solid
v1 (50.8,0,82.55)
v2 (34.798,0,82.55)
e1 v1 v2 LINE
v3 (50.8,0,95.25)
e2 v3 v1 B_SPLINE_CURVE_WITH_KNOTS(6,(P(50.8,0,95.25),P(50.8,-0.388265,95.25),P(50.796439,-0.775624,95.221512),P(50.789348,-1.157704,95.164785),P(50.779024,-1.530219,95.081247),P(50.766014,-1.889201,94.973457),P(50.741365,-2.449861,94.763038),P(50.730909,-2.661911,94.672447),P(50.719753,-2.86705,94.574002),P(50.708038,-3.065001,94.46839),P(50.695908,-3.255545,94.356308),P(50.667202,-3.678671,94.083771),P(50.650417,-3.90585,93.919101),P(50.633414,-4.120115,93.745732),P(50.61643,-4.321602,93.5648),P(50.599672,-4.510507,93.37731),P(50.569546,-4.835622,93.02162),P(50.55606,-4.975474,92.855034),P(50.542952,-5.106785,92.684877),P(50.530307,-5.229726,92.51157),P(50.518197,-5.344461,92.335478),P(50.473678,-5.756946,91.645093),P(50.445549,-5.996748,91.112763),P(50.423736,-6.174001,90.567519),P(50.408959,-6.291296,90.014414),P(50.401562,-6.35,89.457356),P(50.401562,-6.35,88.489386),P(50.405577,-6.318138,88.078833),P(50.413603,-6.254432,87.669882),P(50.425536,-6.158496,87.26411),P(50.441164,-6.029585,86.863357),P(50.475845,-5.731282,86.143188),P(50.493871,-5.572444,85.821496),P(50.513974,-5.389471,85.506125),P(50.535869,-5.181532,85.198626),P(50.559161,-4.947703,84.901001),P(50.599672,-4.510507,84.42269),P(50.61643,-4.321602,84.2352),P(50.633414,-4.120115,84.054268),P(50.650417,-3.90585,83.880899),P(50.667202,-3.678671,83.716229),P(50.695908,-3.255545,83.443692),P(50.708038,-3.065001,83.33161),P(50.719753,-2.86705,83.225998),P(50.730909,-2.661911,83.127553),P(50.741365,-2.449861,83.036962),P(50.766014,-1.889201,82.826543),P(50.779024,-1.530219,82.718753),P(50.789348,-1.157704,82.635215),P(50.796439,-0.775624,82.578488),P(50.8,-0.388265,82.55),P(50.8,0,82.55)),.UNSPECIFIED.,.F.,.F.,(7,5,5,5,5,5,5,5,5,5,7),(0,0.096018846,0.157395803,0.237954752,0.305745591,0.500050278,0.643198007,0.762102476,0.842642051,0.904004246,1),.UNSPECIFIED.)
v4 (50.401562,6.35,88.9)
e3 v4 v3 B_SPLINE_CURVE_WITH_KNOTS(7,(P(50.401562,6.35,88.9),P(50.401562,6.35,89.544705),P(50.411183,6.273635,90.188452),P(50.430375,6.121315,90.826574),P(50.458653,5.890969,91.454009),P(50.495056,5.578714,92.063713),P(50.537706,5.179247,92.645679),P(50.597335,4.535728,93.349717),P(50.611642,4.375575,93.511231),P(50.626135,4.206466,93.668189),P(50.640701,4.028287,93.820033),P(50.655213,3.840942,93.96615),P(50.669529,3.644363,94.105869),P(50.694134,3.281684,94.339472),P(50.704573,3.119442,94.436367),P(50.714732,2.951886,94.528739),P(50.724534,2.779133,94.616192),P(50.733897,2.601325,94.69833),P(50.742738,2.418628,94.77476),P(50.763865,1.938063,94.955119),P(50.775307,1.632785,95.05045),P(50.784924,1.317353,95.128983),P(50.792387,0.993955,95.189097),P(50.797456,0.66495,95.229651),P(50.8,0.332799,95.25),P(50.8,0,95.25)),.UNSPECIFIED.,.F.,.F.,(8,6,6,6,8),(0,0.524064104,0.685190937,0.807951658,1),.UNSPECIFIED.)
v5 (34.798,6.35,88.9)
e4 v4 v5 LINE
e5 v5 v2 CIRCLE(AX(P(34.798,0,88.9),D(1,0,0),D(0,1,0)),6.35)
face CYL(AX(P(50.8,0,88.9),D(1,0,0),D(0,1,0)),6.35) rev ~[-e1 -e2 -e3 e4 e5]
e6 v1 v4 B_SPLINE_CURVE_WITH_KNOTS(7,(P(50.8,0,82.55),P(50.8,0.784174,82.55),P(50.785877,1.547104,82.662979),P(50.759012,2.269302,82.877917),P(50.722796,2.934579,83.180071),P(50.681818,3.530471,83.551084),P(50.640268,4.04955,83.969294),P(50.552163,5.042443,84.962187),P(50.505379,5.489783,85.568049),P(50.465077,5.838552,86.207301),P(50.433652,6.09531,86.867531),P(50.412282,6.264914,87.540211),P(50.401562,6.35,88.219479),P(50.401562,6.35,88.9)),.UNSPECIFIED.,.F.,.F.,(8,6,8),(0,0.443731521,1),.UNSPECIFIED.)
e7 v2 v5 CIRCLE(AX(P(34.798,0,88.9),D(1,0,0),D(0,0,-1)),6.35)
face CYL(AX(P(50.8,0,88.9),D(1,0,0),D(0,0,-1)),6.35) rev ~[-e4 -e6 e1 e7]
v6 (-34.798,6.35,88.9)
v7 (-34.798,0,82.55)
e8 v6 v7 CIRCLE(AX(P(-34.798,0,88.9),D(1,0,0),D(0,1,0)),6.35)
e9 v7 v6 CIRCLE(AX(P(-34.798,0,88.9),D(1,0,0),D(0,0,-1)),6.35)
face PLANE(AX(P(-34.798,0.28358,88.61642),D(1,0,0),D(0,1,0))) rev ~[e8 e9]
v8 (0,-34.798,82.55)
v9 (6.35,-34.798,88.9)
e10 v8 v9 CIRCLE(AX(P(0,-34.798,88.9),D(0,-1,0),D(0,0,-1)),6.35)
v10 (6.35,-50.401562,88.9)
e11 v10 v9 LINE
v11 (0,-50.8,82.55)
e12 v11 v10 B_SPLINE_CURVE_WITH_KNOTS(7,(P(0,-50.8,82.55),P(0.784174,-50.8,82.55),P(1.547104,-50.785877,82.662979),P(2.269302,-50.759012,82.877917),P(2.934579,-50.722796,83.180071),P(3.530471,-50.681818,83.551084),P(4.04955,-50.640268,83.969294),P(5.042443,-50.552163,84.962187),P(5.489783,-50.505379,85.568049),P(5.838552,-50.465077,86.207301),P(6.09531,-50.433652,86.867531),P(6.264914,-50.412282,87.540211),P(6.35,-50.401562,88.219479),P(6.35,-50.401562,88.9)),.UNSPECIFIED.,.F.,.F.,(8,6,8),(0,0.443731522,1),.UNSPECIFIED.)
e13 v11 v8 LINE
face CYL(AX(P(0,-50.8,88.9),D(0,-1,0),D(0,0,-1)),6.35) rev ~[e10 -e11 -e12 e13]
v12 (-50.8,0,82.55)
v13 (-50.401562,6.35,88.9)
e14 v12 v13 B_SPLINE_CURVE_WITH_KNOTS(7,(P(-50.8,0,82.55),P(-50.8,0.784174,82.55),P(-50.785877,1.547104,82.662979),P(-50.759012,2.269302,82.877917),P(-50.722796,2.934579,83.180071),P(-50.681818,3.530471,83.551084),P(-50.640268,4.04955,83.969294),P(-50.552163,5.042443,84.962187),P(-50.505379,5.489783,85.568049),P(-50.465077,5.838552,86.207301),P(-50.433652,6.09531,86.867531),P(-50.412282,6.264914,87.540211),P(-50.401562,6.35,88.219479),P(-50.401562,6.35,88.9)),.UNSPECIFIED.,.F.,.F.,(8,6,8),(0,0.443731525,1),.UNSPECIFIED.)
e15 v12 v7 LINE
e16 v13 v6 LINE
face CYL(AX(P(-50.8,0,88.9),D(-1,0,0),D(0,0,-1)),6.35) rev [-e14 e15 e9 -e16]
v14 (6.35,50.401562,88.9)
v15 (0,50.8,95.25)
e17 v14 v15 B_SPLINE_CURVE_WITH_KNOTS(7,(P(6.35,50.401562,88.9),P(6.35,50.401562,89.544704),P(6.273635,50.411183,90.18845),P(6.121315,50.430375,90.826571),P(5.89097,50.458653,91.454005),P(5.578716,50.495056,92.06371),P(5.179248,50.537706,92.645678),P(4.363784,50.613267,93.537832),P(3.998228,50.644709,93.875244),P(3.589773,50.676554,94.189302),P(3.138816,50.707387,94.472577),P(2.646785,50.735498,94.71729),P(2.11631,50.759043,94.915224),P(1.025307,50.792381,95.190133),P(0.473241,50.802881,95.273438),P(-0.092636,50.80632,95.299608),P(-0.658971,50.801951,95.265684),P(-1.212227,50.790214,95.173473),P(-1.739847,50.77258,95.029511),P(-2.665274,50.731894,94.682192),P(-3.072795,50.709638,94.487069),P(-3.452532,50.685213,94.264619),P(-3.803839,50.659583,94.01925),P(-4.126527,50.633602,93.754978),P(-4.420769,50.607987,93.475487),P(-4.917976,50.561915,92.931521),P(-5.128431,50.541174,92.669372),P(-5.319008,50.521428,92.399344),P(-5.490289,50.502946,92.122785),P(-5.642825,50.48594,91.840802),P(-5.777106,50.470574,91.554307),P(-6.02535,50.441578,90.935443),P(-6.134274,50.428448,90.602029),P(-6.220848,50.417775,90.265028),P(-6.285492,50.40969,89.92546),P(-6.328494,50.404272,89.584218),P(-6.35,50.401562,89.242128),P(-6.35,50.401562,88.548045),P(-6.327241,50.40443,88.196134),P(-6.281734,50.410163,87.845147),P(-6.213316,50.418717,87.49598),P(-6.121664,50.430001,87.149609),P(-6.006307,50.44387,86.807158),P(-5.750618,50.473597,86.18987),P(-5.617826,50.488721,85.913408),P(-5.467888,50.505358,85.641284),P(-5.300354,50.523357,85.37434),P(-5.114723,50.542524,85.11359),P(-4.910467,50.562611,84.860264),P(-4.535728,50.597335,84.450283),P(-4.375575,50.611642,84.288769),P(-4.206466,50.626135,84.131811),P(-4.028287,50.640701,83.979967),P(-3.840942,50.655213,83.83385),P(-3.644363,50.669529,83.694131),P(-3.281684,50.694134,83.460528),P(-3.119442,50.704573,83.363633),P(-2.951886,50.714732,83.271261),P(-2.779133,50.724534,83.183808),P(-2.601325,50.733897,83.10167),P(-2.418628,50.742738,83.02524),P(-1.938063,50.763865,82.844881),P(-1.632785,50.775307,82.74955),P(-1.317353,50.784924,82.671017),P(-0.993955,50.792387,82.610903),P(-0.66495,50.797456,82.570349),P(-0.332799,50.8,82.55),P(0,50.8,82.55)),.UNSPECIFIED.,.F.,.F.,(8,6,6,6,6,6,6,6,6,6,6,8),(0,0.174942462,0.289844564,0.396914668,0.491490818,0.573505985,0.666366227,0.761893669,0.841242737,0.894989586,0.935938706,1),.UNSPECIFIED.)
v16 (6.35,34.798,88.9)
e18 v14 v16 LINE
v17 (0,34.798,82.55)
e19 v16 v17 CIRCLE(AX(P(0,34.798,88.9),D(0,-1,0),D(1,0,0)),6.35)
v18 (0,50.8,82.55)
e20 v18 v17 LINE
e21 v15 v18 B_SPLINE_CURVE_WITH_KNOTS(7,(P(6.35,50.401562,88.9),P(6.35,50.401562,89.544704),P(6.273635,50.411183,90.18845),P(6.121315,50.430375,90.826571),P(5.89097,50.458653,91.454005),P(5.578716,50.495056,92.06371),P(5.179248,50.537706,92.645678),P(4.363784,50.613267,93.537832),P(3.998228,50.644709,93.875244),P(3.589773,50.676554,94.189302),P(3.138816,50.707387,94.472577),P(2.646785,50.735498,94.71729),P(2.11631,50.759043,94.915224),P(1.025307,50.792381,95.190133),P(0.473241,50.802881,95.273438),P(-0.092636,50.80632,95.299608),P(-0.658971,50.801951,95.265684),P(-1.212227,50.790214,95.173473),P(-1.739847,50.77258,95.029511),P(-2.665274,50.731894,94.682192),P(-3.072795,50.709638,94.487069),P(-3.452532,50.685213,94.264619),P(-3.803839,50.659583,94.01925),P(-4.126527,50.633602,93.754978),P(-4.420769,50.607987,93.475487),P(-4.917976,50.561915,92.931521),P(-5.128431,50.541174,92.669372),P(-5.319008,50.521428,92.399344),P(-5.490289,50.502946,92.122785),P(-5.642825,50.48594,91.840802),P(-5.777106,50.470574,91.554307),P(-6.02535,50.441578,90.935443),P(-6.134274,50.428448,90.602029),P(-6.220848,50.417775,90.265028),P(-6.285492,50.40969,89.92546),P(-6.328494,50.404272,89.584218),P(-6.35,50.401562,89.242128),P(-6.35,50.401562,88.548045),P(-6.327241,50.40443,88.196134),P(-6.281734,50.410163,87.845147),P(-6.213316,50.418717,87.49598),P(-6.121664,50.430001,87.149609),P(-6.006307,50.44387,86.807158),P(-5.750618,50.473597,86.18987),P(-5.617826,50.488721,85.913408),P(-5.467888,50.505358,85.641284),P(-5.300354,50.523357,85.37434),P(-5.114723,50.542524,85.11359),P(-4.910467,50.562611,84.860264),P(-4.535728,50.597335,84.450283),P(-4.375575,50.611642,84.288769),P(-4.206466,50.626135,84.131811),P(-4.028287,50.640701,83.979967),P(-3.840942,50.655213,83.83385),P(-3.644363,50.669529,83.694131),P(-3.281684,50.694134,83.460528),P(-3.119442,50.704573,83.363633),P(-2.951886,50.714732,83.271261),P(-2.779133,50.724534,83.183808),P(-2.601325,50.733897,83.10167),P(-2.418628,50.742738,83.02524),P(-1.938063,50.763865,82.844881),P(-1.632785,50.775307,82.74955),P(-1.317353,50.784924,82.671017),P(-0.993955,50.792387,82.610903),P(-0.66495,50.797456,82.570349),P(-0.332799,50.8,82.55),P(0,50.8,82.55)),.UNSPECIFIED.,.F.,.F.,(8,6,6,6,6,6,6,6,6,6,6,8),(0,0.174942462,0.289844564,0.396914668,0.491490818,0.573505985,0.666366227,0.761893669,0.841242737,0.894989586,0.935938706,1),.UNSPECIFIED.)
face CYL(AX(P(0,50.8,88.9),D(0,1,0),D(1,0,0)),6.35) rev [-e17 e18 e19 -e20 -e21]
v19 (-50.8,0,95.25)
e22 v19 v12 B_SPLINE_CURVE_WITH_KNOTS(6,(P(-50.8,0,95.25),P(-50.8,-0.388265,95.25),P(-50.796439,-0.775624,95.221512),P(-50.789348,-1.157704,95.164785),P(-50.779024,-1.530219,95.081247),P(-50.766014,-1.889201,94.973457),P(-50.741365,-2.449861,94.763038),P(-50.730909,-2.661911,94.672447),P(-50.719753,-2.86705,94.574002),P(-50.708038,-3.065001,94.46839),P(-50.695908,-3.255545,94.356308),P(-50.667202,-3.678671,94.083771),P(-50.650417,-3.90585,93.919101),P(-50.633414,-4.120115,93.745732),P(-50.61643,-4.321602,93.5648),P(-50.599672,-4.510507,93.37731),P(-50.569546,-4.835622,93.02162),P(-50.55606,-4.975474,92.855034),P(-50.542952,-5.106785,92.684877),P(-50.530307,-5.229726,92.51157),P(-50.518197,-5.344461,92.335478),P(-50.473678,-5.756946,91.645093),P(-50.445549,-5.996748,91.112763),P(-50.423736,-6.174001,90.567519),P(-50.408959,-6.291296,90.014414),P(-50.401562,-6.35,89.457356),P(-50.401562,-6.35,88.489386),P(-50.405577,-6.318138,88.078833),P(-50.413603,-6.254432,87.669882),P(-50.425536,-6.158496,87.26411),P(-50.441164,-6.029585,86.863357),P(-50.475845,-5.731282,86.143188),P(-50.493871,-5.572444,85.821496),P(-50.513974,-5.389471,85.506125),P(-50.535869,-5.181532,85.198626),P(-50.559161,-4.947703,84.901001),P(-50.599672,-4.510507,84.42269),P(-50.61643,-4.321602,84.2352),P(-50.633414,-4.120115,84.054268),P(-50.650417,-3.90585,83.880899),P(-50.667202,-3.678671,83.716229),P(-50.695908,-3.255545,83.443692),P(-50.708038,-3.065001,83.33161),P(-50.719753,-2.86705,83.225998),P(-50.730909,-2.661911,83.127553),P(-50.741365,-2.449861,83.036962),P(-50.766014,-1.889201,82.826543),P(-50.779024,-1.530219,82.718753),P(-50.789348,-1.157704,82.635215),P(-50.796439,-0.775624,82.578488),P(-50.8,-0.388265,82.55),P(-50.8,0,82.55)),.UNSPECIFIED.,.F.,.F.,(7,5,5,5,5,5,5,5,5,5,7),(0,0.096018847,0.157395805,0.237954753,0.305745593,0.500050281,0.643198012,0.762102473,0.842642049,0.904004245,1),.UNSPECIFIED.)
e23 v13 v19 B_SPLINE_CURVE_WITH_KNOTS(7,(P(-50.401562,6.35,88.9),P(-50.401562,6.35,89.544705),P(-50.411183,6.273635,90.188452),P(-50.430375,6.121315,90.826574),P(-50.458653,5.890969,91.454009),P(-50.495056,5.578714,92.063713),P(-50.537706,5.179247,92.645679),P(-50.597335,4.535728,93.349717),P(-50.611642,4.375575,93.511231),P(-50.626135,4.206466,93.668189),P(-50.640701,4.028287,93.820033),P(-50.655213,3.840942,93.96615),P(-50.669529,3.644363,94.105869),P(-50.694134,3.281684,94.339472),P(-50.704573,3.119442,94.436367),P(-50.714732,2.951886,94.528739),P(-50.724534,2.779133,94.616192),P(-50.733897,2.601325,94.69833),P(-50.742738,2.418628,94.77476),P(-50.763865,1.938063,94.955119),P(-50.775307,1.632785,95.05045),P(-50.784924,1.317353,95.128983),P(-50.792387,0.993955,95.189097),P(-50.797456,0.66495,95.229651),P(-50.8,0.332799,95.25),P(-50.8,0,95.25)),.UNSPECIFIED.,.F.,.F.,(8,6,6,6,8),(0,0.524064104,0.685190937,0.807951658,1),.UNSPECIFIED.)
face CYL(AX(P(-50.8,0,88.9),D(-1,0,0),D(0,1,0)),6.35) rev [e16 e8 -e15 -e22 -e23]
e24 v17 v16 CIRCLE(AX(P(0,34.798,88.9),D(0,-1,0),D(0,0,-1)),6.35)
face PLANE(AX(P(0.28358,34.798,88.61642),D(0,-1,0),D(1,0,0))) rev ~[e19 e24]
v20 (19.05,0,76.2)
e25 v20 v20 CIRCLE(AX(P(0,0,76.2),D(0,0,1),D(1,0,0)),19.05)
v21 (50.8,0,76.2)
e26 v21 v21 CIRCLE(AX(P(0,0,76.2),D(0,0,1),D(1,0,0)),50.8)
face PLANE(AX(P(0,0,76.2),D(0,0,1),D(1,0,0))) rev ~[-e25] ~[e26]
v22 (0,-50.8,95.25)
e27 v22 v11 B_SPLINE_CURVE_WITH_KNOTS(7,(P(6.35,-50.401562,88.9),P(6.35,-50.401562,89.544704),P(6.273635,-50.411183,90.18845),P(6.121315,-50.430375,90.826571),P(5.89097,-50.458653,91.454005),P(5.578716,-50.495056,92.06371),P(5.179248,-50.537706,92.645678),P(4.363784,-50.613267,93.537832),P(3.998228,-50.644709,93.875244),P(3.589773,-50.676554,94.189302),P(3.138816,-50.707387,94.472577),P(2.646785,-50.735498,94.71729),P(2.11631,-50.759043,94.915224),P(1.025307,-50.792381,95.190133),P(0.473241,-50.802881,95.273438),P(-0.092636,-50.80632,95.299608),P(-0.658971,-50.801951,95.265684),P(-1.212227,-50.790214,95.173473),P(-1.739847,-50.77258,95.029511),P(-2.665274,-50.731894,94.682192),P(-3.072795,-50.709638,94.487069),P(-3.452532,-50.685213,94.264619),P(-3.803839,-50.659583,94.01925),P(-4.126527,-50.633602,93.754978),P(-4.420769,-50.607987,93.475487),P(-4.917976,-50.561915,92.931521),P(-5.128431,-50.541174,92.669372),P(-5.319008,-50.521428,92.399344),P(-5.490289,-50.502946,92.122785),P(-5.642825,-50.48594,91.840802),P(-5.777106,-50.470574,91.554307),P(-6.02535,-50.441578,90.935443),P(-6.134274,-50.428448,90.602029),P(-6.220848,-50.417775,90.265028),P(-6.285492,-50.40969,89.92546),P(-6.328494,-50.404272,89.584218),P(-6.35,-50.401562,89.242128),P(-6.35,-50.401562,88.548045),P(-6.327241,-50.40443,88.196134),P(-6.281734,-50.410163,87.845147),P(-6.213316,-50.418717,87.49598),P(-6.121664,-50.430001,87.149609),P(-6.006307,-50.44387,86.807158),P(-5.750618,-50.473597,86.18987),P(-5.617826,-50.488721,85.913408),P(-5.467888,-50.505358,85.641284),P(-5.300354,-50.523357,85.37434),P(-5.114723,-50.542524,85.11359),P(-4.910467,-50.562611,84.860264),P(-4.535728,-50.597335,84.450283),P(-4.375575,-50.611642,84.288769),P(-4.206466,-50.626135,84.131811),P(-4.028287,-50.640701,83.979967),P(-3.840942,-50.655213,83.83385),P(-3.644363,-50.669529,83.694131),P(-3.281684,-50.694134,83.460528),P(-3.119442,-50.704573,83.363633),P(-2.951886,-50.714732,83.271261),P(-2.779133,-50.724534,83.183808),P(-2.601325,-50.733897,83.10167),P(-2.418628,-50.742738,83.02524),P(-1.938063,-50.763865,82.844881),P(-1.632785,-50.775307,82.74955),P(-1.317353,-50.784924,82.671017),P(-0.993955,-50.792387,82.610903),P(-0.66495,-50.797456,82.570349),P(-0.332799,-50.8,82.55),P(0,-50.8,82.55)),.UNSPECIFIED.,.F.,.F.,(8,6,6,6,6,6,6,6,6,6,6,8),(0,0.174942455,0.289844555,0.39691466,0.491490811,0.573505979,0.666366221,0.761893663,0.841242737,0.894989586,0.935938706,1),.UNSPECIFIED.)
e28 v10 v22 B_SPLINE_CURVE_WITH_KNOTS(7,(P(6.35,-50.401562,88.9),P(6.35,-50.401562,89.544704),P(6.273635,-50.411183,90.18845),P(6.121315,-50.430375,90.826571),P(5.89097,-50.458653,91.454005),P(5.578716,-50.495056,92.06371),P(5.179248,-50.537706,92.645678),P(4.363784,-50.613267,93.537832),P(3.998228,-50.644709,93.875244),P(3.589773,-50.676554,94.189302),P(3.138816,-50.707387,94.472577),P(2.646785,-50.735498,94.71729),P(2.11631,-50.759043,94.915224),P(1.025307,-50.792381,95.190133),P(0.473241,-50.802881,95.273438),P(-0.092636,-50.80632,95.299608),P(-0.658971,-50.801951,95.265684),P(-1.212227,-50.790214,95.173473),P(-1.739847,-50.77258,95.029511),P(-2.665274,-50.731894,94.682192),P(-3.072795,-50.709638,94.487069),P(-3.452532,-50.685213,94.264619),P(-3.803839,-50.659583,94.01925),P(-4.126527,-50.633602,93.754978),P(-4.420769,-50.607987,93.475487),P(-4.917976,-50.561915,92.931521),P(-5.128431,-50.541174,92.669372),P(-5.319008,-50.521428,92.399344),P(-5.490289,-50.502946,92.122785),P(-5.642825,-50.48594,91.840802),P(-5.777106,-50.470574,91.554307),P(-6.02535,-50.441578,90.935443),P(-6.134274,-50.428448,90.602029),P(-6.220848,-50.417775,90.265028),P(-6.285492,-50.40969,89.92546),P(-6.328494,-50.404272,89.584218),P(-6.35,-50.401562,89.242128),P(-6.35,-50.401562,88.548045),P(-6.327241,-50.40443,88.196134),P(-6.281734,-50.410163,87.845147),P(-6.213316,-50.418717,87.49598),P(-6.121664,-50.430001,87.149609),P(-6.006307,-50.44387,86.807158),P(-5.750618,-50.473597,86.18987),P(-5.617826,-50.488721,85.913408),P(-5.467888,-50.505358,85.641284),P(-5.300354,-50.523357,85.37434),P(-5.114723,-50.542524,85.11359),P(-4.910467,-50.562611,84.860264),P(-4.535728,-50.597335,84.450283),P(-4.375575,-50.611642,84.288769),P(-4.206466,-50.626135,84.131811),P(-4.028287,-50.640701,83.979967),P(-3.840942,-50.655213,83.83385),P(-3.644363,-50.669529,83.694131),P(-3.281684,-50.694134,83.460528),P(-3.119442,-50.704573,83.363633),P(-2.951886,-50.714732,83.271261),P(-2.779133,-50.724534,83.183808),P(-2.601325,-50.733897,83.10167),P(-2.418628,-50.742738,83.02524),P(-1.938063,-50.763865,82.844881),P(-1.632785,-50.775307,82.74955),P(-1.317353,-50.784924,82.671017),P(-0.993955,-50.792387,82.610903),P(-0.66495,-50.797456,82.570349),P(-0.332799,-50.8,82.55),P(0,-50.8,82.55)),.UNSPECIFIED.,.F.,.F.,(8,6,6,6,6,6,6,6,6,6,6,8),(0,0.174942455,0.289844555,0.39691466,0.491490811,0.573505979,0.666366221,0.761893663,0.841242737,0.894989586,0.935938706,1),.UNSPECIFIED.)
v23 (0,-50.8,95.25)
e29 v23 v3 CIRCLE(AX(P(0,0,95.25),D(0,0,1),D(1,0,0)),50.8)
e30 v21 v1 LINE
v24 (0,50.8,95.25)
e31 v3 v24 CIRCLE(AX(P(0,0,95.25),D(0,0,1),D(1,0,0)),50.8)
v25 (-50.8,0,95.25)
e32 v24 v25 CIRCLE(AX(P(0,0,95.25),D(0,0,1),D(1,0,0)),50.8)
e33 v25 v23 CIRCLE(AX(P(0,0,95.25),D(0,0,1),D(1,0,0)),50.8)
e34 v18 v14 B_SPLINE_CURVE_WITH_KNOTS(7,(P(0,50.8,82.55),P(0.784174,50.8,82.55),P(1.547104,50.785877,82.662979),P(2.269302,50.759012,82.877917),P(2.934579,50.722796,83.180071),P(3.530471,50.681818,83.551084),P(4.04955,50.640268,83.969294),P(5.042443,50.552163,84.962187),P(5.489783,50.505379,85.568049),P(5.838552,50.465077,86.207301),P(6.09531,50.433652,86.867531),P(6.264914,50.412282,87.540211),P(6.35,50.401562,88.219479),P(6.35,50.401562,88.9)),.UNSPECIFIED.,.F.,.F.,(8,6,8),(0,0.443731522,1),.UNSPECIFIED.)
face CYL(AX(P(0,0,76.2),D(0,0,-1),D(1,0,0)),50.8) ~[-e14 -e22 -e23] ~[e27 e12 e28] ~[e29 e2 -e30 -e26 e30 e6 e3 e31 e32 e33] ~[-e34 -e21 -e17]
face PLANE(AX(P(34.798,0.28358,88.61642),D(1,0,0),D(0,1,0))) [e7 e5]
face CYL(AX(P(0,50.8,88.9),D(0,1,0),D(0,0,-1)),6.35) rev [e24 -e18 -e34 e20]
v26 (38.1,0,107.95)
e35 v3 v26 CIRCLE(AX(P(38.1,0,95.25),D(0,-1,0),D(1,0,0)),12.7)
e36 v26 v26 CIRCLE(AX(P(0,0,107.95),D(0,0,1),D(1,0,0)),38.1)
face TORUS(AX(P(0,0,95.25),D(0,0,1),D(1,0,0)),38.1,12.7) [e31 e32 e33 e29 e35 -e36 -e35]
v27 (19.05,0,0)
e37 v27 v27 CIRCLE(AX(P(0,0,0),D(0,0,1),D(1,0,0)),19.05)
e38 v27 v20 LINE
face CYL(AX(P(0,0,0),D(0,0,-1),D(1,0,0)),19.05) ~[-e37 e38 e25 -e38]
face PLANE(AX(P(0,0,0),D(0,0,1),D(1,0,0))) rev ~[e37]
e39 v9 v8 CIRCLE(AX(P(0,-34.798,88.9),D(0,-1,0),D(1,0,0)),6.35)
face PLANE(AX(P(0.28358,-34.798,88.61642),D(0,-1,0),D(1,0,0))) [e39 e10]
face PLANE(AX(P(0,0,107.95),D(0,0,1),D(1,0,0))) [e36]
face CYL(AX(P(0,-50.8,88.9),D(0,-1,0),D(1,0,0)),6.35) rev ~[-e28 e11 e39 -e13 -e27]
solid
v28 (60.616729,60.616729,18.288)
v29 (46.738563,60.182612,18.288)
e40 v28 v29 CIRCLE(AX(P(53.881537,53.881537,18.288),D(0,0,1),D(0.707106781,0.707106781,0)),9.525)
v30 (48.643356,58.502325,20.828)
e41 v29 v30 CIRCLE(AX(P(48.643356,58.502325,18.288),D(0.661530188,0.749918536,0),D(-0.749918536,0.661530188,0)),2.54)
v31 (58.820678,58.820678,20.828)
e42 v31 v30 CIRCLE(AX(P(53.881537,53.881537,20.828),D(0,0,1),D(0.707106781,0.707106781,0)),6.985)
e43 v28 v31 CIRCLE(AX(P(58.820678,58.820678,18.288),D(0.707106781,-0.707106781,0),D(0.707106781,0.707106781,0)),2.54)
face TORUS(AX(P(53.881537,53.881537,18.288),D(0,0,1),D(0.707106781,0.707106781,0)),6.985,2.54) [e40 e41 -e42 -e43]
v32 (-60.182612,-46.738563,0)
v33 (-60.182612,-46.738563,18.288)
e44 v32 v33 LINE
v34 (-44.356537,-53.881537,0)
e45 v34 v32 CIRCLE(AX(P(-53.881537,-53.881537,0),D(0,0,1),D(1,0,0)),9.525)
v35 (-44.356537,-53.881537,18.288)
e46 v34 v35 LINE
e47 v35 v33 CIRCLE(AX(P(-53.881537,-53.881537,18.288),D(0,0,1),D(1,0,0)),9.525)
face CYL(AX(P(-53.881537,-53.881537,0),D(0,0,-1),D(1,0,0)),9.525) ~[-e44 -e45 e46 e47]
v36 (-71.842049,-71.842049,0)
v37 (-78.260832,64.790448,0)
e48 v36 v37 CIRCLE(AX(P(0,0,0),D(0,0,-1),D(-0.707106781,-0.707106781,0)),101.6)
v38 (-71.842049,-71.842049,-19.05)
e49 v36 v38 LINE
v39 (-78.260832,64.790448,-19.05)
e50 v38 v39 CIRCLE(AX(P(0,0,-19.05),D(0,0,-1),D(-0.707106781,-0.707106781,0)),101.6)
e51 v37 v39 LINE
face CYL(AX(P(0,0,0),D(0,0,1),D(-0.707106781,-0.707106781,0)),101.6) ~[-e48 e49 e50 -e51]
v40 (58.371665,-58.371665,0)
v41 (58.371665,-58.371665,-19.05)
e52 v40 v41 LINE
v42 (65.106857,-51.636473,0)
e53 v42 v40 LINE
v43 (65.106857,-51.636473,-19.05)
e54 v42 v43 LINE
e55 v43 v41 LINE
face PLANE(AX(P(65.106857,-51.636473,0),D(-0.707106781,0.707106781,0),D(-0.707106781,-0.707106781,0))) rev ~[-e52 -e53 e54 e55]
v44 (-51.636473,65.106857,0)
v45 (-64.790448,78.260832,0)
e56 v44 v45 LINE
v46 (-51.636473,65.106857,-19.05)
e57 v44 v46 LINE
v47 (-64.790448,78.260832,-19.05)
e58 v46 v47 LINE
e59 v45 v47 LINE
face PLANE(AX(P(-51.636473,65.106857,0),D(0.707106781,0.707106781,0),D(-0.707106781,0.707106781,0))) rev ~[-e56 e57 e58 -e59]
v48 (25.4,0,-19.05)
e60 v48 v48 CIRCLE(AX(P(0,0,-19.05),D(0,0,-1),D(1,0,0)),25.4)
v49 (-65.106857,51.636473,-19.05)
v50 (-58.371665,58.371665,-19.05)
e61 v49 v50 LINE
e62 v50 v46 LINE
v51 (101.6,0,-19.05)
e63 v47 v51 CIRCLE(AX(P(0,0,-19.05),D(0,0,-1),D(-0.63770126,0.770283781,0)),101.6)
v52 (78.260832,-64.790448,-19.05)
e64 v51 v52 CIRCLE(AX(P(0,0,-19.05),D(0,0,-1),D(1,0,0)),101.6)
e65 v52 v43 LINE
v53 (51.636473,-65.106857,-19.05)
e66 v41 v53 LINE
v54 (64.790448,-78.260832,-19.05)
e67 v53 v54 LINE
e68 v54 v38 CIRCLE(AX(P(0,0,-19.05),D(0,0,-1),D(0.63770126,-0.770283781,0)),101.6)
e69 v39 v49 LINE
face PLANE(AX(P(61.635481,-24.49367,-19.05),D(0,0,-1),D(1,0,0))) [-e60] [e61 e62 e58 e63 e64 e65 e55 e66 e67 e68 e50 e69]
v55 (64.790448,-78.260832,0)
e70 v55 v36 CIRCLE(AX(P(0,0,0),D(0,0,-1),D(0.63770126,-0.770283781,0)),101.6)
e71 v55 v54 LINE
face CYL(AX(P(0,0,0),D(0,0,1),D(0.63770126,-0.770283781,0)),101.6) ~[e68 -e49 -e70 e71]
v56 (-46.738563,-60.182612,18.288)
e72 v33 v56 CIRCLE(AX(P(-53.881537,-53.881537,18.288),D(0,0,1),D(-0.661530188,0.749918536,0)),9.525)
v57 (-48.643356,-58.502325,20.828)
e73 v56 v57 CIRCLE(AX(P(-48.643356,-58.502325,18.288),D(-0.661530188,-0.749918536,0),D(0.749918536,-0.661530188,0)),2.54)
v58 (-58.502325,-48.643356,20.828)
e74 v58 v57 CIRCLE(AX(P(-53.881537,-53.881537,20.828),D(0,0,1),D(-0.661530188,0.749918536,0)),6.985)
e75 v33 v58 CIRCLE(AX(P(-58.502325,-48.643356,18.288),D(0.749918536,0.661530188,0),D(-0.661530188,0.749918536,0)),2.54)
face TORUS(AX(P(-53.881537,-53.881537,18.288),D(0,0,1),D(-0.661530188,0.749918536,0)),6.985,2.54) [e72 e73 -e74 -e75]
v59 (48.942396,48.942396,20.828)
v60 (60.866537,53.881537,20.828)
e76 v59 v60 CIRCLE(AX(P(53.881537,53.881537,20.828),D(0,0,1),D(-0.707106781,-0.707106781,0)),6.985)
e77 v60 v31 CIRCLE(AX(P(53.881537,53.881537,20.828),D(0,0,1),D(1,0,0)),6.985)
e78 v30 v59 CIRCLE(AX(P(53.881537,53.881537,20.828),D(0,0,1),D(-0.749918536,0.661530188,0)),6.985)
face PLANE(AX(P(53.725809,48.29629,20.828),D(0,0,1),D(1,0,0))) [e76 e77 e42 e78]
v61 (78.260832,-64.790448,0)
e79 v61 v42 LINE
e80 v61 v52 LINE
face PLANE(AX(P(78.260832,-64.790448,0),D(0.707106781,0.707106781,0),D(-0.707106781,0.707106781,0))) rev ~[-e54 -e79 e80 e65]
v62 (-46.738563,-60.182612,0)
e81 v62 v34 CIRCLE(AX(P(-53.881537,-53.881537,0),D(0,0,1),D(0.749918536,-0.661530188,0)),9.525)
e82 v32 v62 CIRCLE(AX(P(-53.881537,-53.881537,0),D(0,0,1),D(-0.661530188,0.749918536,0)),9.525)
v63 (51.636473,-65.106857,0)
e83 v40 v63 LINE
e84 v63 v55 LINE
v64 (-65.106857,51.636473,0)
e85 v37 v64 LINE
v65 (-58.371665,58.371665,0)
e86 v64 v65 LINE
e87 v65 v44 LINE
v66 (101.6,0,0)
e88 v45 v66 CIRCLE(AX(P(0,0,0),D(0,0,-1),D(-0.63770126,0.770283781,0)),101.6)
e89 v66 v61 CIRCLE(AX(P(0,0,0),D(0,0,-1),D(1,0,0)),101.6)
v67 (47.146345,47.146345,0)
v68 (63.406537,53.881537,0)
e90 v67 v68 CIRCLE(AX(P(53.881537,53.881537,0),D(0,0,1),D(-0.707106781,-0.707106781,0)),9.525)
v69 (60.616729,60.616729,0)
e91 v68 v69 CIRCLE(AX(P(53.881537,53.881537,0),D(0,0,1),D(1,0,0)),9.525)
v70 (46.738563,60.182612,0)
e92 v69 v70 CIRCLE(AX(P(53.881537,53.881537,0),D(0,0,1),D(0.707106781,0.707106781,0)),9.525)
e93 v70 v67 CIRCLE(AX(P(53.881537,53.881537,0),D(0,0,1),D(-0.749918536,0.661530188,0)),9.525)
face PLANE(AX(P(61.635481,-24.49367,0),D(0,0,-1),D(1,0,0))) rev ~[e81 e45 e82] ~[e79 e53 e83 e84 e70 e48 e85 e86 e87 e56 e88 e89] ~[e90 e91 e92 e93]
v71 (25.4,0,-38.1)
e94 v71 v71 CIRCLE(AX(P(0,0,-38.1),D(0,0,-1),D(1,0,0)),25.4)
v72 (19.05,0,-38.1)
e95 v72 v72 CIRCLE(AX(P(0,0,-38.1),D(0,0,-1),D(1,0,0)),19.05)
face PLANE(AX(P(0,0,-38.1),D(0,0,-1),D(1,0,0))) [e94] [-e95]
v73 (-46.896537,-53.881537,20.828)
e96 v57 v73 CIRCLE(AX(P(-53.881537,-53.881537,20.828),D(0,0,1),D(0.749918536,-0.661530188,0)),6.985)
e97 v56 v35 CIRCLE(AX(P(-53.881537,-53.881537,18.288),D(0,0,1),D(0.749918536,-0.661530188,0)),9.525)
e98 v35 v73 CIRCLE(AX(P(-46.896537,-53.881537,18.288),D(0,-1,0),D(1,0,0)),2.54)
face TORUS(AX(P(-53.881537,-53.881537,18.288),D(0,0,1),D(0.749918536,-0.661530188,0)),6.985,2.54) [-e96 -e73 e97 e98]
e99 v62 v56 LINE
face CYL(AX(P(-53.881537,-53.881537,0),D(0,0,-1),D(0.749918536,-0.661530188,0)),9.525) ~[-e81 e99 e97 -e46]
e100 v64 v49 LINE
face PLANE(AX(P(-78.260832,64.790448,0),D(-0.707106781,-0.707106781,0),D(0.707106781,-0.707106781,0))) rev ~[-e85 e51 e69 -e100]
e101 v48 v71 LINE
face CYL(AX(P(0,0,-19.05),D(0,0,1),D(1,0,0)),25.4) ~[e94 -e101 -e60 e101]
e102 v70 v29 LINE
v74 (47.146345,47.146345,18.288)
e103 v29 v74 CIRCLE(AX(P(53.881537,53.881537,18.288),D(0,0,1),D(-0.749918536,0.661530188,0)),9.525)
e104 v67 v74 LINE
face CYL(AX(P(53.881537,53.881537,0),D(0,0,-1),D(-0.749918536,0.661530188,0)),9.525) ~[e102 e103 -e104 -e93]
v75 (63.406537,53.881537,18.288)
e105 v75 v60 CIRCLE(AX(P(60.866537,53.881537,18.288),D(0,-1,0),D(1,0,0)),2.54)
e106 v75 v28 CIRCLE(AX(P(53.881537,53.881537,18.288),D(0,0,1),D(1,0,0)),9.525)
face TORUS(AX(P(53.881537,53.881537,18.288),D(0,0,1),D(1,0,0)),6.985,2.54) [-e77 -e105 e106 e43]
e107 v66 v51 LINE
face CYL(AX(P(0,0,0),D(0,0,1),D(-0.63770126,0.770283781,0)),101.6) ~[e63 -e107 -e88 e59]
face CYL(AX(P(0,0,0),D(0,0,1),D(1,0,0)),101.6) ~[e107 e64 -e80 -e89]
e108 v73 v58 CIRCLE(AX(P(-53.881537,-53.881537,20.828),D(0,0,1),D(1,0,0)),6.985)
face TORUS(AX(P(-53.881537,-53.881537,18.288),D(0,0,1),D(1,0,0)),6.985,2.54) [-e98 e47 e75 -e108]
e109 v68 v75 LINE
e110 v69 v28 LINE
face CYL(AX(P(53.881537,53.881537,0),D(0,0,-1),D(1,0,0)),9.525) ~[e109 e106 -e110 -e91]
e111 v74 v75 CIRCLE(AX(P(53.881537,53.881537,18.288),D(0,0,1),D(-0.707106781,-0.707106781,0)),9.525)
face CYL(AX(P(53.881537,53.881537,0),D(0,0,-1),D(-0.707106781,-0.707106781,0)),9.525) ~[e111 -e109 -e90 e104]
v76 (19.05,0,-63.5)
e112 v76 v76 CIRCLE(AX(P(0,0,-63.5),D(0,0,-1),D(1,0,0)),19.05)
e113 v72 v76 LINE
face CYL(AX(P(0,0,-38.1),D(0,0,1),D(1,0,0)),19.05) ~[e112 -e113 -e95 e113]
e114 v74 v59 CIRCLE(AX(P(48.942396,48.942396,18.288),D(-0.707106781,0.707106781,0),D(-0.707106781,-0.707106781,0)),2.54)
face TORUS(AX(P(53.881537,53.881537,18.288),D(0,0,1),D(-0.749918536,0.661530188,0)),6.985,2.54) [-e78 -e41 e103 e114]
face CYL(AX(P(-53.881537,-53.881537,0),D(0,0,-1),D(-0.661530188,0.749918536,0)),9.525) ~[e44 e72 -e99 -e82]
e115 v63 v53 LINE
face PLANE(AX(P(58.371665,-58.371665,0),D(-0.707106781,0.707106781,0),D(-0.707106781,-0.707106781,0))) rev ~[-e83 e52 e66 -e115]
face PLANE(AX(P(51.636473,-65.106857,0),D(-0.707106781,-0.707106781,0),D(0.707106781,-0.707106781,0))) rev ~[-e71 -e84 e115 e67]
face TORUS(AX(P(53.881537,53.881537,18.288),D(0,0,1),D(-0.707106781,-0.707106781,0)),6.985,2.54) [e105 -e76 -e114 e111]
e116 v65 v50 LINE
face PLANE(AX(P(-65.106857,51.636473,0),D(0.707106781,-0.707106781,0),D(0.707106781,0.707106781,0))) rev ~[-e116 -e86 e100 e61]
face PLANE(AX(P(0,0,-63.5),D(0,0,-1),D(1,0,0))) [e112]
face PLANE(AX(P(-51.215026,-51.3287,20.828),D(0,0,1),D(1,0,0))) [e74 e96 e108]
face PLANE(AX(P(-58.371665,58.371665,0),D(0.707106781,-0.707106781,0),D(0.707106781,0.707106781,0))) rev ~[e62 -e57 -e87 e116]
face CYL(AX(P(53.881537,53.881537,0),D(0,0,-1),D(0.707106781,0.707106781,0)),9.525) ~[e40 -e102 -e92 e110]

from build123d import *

# Parameters (mm, degrees)
F0_R      = 19.05
F1_DEPTH  = 76.2
F2_R      = 50.8
F2_R_2    = 19.05
F3_DEPTH  = 31.75
F4_R      = 12.7
F7_DEPTH  = 16.002
F10_DEPTH = 16.002
F13_DEPTH = 16.002
F16_DEPTH = 16.002
F18_DEPTH = 19.05
F20_DEPTH = 20.828
F21_R     = 2.54
F22_R     = 25.4
F23_DEPTH = 19.05
F24_R     = 19.05
F25_DEPTH = 25.4


with BuildPart() as f1:
    # F0 (on Top) → F1 (new body)
    with BuildSketch(Plane.XY):
        Circle(F0_R)
    extrude(amount=F1_DEPTH)

    # F2 (on face) → F3 (join)
    with BuildSketch(Plane.XY.offset(76.2)):
        Circle(F2_R)
        Circle(F2_R_2, mode=Mode.SUBTRACT)
        Circle(F2_R_2)
    extrude(amount=F3_DEPTH)

    # F4
    f4_edges = [f1.edges().sort_by_distance(p)[0] for p in [
        (-50.8, 0, 107.95),
    ]]
    fillet(f4_edges, radius=F4_R)

    # F6 (on offset) → F7 (cut)
    with BuildSketch(Plane.XZ.offset(50.8)):
        with BuildLine():
            ThreePointArc((0, 82.55), (4.4901280605, 84.4098719395), (6.35, 88.9))
            ThreePointArc((6.35, 88.9), (-4.4901280605, 93.3901280605), (0, 82.55))
        make_face()
    extrude(amount=-F7_DEPTH, mode=Mode.SUBTRACT)

    # F9 (on offset) → F10 (cut)
    with BuildSketch(Plane.YZ.offset(-50.8)):
        with BuildLine():
            ThreePointArc((0, 82.55), (4.4901280605, 84.4098719395), (6.35, 88.9))
            ThreePointArc((6.35, 88.9), (-4.4901280605, 93.3901280605), (0, 82.55))
        make_face()
    extrude(amount=F10_DEPTH, mode=Mode.SUBTRACT)

    # F12 (on offset) → F13 (cut)
    with BuildSketch(Plane.XZ.offset(-50.8)):
        with BuildLine():
            ThreePointArc((0, 82.55), (4.4901280605, 84.4098719395), (6.35, 88.9))
            ThreePointArc((6.35, 88.9), (-4.4901280605, 93.3901280605), (0, 82.55))
        make_face()
    extrude(amount=F13_DEPTH, mode=Mode.SUBTRACT)

    # F15 (on offset) → F16 (cut)
    with BuildSketch(Plane.YZ.offset(50.8)):
        with BuildLine():
            ThreePointArc((0, 82.55), (4.4901280605, 84.4098719395), (6.35, 88.9))
            ThreePointArc((6.35, 88.9), (-4.4901280605, 93.3901280605), (0, 82.55))
        make_face()
    extrude(amount=-F16_DEPTH, mode=Mode.SUBTRACT)


with BuildPart() as f18:
    # F17 (on face) → F18 (new body)
    with BuildSketch(Plane(origin=(0, 0, 0), x_dir=(1, 0, 0), z_dir=(0, 0, -1))):
        with BuildLine():
            Line((19.05, 0), (101.6, 0))
            ThreePointArc((101.6, 0), (95.5872913823, 34.4329744025), (78.2608321613, 64.7904479797))
            Line((78.2608321613, 64.7904479797), (65.1068568778, 51.6364726961))
            Line((65.1068568778, 51.6364726961), (58.3716647869, 58.3716647869))
            Line((58.3716647869, 58.3716647869), (13.4703841816, 13.4703841816))
            ThreePointArc((13.4703841816, 13.4703841816), (17.5999050943, 7.2901193866), (19.05, 0))
        make_face()
        with BuildLine():
            ThreePointArc((-64.7904479797, -78.2608321613), (43.2426322352, -91.9382116281), (101.6, 0))
            Line((101.6, 0), (19.05, 0))
            ThreePointArc((19.05, 0), (0, -19.05), (-19.05, 0))
            Line((-19.05, 0), (-101.6, 0))
            ThreePointArc((-101.6, 0), (-95.5872913823, -34.4329744025), (-78.2608321613, -64.7904479797))
            Line((-78.2608321613, -64.7904479797), (-65.1068568778, -51.6364726961))
            Line((-65.1068568778, -51.6364726961), (-58.3716647869, -58.3716647869))
            Line((-58.3716647869, -58.3716647869), (-51.6364726961, -65.1068568778))
            Line((-51.6364726961, -65.1068568778), (-64.7904479797, -78.2608321613))
        make_face()
        with BuildLine():
            ThreePointArc((-19.05, 0), (0, -19.05), (19.05, 0))
            Line((19.05, 0), (0, 0))
            Line((0, 0), (-19.05, 0))
        make_face()
        with BuildLine():
            Line((0, 0), (19.05, 0))
            ThreePointArc((19.05, 0), (17.5999050943, 7.2901193866), (13.4703841816, 13.4703841816))
            Line((13.4703841816, 13.4703841816), (0, 0))
        make_face()
        with BuildLine():
            Line((-13.4703841816, 13.4703841816), (0, 0))
            Line((0, 0), (0, 19.05))
            ThreePointArc((0, 19.05), (-7.2901193866, 17.5999050943), (-13.4703841816, 13.4703841816))
        make_face()
        with BuildLine():
            Line((0, 19.05), (0, 0))
            Line((0, 0), (13.4703841816, 13.4703841816))
            ThreePointArc((13.4703841816, 13.4703841816), (7.2901193866, 17.5999050943), (0, 19.05))
        make_face()
        with BuildLine():
            Line((-19.05, 0), (0, 0))
            Line((0, 0), (-13.4703841816, 13.4703841816))
            ThreePointArc((-13.4703841816, 13.4703841816), (-17.5999050943, 7.2901193866), (-19.05, 0))
        make_face()
        with BuildLine():
            ThreePointArc((0, 19.05), (7.2901193866, 17.5999050943), (13.4703841816, 13.4703841816))
            Line((13.4703841816, 13.4703841816), (58.3716647869, 58.3716647869))
            Line((58.3716647869, 58.3716647869), (51.6364726961, 65.1068568778))
            Line((51.6364726961, 65.1068568778), (64.7904479797, 78.2608321613))
            ThreePointArc((64.7904479797, 78.2608321613), (34.4329744025, 95.5872913823), (0, 101.6))
            Line((0, 101.6), (0, 19.05))
        make_face()
        with BuildLine():
            Line((-101.6, 0), (-19.05, 0))
            ThreePointArc((-19.05, 0), (-17.5999050943, 7.2901193866), (-13.4703841816, 13.4703841816))
            Line((-13.4703841816, 13.4703841816), (-71.8420489686, 71.8420489686))
            ThreePointArc((-71.8420489686, 71.8420489686), (-93.8661605031, 38.8806367283), (-101.6, 0))
        make_face()
        with BuildLine():
            ThreePointArc((-13.4703841816, 13.4703841816), (-7.2901193866, 17.5999050943), (0, 19.05))
            Line((0, 19.05), (0, 101.6))
            ThreePointArc((0, 101.6), (-38.8806367283, 93.8661605031), (-71.8420489686, 71.8420489686))
            Line((-71.8420489686, 71.8420489686), (-13.4703841816, 13.4703841816))
        make_face()
    extrude(amount=F18_DEPTH)

    # F19 (on face) → F20 (join)
    with BuildSketch(Plane.XY):
        with BuildLine():
            ThreePointArc((-60.182611768, -46.7385626735), (-53.8815367264, -53.8815367264), (-46.7385626735, -60.182611768))
            ThreePointArc((-46.7385626735, -60.182611768), (-44.9719224572, -57.2496814046), (-44.3565367264, -53.8815367264))
            ThreePointArc((-44.3565367264, -53.8815367264), (-49.9631260008, -45.1998501169), (-60.182611768, -46.7385626735))
        make_face()
        with BuildLine():
            ThreePointArc((-60.182611768, -46.7385626735), (-60.6167288172, -60.6167288172), (-46.7385626735, -60.182611768))
            ThreePointArc((-46.7385626735, -60.182611768), (-53.8815367264, -53.8815367264), (-60.182611768, -46.7385626735))
        make_face()
        with BuildLine():
            Line((53.8815367264, 53.8815367264), (47.1463446356, 47.1463446356))
            ThreePointArc((47.1463446356, 47.1463446356), (53.5837348875, 44.3611932943), (60.182611768, 46.7385626735))
            ThreePointArc((60.182611768, 46.7385626735), (57.1437924233, 50.4086003325), (53.8815367264, 53.8815367264))
        make_face()
        with BuildLine():
            ThreePointArc((46.7385626735, 60.182611768), (44.3611932943, 53.5837348875), (47.1463446356, 47.1463446356))
            Line((47.1463446356, 47.1463446356), (53.8815367264, 53.8815367264))
            ThreePointArc((53.8815367264, 53.8815367264), (50.4086003325, 57.1437924233), (46.7385626735, 60.182611768))
        make_face()
        with BuildLine():
            ThreePointArc((60.6167288172, 60.6167288172), (53.5837348875, 63.4018801585), (46.7385626735, 60.182611768))
            ThreePointArc((46.7385626735, 60.182611768), (50.4086003325, 57.1437924233), (53.8815367264, 53.8815367264))
            Line((53.8815367264, 53.8815367264), (60.6167288172, 60.6167288172))
        make_face()
        with BuildLine():
            ThreePointArc((53.8815367264, 53.8815367264), (57.1437924233, 50.4086003325), (60.182611768, 46.7385626735))
            ThreePointArc((60.182611768, 46.7385626735), (62.5632233359, 49.9631260008), (63.4065367264, 53.8815367264))
            ThreePointArc((63.4065367264, 53.8815367264), (62.6814892736, 57.5265964197), (60.6167288172, 60.6167288172))
            Line((60.6167288172, 60.6167288172), (53.8815367264, 53.8815367264))
        make_face()
    extrude(amount=F20_DEPTH)

    # F21
    f21_edges = [f18.edges().sort_by_distance(p)[0] for p in [
        (47.580462, 61.024511, 20.828),
        (-63.406537, -53.881537, 20.828),
    ]]
    fillet(f21_edges, radius=F21_R)

    # F22 (on face) → F23 (join)
    with BuildSketch(Plane(origin=(0, 0, -19.05), x_dir=(1, 0, 0), z_dir=(0, 0, -1))):
        Circle(F22_R)
    extrude(amount=F23_DEPTH)

    # F24 (on face) → F25 (join)
    with BuildSketch(Plane(origin=(0, 0, -38.1), x_dir=(1, 0, 0), z_dir=(0, 0, -1))):
        Circle(F24_R)
    extrude(amount=F25_DEPTH)


solid = Compound([f1.part, f18.part])
